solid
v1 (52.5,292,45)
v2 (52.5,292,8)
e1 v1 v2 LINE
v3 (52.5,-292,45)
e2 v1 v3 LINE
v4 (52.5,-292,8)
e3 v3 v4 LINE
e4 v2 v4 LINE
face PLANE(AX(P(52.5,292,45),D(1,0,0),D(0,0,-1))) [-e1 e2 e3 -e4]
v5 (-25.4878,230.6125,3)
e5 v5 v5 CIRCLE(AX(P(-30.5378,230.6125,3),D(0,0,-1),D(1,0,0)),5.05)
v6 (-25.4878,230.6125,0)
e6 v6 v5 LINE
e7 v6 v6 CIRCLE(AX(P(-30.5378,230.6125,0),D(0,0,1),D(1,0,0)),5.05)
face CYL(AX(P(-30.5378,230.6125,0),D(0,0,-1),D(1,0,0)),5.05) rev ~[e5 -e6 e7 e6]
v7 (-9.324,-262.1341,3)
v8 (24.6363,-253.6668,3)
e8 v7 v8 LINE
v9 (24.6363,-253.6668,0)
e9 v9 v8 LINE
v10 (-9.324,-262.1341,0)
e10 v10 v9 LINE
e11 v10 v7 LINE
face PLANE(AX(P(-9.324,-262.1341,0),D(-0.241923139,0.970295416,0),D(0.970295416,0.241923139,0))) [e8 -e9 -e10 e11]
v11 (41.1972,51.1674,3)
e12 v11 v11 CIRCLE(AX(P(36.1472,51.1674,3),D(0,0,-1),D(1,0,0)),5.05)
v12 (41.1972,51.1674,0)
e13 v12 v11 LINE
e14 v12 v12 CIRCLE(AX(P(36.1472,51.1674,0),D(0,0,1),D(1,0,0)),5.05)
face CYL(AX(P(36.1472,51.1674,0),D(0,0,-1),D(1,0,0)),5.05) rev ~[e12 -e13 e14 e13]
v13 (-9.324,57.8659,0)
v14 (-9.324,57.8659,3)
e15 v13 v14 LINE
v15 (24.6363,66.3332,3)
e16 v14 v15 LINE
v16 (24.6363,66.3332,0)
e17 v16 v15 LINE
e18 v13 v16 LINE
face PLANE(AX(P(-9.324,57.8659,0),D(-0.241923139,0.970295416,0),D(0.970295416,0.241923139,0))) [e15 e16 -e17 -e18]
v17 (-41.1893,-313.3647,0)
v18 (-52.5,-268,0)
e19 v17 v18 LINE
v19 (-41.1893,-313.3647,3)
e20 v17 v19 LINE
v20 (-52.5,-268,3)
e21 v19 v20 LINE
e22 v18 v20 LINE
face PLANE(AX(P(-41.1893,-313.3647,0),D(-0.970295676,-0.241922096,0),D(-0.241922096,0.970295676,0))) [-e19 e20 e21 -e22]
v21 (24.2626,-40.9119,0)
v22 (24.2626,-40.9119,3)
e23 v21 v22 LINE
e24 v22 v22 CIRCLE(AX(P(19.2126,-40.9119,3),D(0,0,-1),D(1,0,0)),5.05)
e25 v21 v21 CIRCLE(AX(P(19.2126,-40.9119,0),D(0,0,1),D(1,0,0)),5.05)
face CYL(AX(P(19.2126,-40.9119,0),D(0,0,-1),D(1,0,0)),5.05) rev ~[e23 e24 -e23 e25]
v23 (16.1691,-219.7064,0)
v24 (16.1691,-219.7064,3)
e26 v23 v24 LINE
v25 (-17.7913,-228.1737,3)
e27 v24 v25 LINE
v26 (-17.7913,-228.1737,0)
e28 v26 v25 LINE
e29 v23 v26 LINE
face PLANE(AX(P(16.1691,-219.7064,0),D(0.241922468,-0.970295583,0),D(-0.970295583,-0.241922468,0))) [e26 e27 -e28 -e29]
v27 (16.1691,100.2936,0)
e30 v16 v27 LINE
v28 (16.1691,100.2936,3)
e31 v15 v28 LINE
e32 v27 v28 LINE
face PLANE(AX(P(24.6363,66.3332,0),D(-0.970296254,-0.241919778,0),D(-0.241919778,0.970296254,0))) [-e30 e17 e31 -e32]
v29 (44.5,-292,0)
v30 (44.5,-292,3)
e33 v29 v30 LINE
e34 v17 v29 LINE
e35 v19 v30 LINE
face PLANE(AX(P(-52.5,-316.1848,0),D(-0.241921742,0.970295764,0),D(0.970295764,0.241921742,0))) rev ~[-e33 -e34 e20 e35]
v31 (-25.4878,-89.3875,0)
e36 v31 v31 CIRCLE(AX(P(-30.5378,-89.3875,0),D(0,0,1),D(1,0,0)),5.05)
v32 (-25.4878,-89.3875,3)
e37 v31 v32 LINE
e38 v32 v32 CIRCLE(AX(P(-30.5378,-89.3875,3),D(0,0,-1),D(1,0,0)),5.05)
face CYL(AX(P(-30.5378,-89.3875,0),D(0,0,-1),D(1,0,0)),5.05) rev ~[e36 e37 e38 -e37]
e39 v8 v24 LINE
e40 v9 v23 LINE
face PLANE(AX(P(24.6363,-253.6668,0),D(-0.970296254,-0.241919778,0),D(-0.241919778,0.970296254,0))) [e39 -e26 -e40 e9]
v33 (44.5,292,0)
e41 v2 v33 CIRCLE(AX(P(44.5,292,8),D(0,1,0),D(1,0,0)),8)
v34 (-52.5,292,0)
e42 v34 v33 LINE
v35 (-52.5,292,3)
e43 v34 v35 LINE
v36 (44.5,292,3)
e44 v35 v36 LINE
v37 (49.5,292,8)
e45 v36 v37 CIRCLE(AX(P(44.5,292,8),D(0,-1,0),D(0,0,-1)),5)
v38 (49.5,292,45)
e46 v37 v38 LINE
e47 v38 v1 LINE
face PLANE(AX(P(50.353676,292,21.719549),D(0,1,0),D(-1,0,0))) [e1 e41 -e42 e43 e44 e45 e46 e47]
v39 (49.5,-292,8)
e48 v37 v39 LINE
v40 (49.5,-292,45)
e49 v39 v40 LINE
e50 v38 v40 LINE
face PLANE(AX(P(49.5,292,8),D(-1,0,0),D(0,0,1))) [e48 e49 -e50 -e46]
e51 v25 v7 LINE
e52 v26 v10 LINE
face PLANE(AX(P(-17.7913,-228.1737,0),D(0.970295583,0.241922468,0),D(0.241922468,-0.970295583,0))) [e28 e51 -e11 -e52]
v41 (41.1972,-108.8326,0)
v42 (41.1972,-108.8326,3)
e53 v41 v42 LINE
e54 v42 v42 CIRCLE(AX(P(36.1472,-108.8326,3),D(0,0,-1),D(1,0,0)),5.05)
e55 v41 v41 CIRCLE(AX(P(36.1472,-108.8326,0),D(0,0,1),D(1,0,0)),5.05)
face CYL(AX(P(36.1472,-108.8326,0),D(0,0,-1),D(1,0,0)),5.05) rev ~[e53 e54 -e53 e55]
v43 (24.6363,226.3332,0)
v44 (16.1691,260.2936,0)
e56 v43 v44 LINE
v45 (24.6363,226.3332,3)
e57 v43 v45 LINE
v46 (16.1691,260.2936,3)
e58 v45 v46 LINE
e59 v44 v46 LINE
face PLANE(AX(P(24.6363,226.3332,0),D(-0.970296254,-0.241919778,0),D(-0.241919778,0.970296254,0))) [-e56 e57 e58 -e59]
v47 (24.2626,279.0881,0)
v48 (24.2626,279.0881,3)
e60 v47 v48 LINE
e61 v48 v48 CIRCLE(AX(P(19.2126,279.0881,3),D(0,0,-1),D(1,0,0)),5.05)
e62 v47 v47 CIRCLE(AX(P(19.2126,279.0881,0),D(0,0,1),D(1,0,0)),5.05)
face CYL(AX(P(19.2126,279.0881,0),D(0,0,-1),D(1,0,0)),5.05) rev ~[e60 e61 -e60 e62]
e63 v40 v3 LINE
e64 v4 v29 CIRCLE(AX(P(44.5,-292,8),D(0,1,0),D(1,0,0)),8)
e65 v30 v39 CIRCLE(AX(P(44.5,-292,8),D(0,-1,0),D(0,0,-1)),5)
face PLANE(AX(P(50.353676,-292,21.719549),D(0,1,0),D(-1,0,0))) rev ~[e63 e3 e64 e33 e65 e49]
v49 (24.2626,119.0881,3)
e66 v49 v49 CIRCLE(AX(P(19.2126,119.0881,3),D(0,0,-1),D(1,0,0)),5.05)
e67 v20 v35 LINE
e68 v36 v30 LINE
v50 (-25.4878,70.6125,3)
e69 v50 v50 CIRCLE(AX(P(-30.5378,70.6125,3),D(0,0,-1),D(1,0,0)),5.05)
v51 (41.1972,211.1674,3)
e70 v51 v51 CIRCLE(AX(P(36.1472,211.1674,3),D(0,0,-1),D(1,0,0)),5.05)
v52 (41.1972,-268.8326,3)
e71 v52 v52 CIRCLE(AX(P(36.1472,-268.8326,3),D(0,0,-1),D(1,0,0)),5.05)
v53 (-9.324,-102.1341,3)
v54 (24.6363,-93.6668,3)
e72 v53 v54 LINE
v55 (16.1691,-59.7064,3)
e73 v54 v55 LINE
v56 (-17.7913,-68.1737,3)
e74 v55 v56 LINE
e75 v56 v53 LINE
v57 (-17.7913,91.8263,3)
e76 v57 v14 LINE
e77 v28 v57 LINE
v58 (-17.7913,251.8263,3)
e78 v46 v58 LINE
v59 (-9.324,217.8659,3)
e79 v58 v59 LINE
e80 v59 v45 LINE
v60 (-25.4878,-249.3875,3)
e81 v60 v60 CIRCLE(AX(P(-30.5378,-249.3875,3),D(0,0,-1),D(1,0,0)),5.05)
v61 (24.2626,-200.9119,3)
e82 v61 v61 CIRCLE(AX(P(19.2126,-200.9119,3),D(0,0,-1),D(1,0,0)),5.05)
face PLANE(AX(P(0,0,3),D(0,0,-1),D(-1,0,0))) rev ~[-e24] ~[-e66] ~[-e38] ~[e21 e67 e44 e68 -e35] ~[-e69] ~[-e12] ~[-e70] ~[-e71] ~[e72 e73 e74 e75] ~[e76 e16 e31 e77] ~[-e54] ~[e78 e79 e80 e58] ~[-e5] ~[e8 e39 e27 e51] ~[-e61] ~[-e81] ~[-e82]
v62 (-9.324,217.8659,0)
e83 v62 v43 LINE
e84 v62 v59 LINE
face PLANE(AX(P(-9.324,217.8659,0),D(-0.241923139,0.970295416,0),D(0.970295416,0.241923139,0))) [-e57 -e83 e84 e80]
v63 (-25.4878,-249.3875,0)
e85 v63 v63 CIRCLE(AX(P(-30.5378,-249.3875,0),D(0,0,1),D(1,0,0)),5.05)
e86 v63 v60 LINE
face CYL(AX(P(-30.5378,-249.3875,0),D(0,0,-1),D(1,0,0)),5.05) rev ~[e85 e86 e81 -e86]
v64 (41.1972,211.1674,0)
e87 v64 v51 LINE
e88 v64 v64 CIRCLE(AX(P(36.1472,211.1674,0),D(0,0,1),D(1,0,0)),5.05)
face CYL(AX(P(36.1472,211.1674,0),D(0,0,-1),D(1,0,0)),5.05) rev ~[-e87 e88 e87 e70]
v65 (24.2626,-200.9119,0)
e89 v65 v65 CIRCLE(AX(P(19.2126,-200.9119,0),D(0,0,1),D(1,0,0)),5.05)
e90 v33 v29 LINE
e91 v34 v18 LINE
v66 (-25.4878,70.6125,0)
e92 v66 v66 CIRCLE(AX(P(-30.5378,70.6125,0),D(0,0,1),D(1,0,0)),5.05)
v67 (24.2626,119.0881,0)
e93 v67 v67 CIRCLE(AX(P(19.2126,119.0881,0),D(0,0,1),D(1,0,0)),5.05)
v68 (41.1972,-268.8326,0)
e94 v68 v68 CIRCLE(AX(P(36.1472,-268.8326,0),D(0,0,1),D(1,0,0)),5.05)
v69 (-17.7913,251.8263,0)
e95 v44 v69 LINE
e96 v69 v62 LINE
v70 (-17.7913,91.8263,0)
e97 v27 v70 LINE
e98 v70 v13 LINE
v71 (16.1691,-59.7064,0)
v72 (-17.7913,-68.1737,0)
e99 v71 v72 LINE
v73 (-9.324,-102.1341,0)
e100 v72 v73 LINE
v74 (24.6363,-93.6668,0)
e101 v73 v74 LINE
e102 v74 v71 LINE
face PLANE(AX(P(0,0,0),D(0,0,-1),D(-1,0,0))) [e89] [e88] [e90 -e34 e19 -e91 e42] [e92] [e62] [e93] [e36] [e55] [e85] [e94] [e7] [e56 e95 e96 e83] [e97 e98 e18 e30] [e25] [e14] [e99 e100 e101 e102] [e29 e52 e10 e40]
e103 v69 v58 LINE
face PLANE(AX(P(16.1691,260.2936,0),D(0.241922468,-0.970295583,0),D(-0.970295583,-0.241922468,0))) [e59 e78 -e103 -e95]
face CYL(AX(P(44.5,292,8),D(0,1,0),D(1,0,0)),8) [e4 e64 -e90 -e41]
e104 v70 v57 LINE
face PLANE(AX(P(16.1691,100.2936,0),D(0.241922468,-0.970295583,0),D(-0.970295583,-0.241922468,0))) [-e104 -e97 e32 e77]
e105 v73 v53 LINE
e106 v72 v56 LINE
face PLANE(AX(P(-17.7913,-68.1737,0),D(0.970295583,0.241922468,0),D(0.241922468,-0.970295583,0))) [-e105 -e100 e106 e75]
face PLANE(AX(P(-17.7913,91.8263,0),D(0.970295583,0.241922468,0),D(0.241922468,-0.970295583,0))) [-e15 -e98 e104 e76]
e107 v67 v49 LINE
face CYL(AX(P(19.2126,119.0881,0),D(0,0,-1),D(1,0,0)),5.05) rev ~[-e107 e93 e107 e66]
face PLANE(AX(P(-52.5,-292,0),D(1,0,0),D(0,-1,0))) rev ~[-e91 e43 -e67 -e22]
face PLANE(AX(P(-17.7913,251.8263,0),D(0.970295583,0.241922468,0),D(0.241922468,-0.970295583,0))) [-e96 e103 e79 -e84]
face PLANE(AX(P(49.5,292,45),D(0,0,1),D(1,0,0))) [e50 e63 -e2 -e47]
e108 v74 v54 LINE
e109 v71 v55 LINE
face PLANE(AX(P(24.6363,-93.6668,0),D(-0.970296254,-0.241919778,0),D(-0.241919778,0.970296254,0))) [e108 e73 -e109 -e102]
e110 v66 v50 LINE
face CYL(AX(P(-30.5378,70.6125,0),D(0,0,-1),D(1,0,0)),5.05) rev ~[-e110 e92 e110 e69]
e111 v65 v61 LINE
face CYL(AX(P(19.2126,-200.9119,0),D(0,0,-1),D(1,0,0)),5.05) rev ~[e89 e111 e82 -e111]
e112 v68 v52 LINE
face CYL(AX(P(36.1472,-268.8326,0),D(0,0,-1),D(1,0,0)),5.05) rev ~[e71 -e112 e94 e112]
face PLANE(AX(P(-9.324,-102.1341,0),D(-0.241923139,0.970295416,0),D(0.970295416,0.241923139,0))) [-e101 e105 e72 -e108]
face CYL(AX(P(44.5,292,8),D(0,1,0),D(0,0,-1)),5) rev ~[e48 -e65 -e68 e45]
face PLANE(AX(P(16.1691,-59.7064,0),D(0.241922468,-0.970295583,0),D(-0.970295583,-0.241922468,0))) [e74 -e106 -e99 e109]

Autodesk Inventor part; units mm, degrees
ref_plane "YZ Plane" through (0, 0, 0) normal (1, 0, 0) x (0, 1, 0)
ref_plane "XZ Plane" through (0, 0, 0) normal (0, 1, 0) x (-1, 0, 0)
ref_plane "XY Plane" through (0, 0, 0) normal (0, 0, 1) x (1, 0, 0)
sketch "Sketch1" plane through (0, 0, 0) normal (0, 0, 1) x (1, 0, 0)
  line L0 (-52.5, 292) -> (52.5, 292)
  line L1 (52.5, 292) -> (52.5, -292)
  line L2 (52.5, -292) -> (-52.5, -292)
  line L3 (-52.5, -292) -> (-52.5, 292)
  line L4 (-52.5, 292) -> (52.5, -292) construction
  point P0 (0, 0)
  point P1 (0, 0)
  dimension "d0" = 105
  dimension "d1" = 584
extrude "Plate1" add sketch "Sketch1" along normal blind 3
sketch "Sketch4" plane through (49.5, 292, 0) normal (1, 0, 0) x (0, 1, 0)
  line L0 (-584, 0) -> (0, 0)
  line L1 (0, 0) -> (0, 45)
  line L2 (0, 45) -> (-584, 45)
  line L3 (-584, 45) -> (-584, 0)
edge flange "Flange1" height 45 angle 90 thickness 3 bend radius 5 thickness toward (1, 0, 0) relief round relief width 3 relief depth 1.5 edges at (52.5, 0, 3) wall of the first edge with corners at (49.5, -292, 0) (49.5, 292, 0) (49.5, 292, 45) (49.5, -292, 45)
bend "Bend1"
corner "Corner1"
sketch "Sketch5" plane through (0, 0, 0) normal (0, 0, -1) x (-1, 0, 0)
  line L0 (-44.5, 292) -> (-44.5, -292) projected
  line L1 (52.5, -292) -> (-44.5, -292) projected
  line L2 (52.5, 292) -> (52.5, -292) projected
  line L3 (-44.5, 292) -> (52.5, 292) projected
  line L4 (52.5, -292) -> (52.5, -316.1848)
  line L5 (-44.5, -292) -> (52.5, -292) projected
  line L6 (52.5, -316.1848) -> (-44.5, -292)
  point P0 (0, 0)
  dimension "d25" = 14
extrude "Extrusion2" add sketch "Sketch5" against normal up to surface (3 mm away) contours L1 L4 L6
sketch "Sketch6" plane through (0, 0, 0) normal (0, 0, -1) x (-1, 0, 0)
  line L0 (-44.5, 292) -> (-44.5, -292) construction
  line L1 (-44.5, -292) -> (52.5, -316.1848) projected
  line L2 (52.5, 292) -> (52.5, -316.1848) projected
  line L3 (-44.5, 292) -> (52.5, 292) construction
  line L4 (41.1893, -313.3647) -> (52.5, -268)
  line L5 (-44.5, -292) -> (52.5, -316.1848) projected
  point P0 (0, 0)
  dimension "d45" = 560
extrude "Cut1" cut sketch "Sketch6" against normal blind 3
sketch "Sketch7" plane through (0, 0, 0) normal (0, 0, 1) x (1, 0, 0)
  line L0 (44.5, -292) -> (-41.1893, -313.3647) projected
  circle A0 centre (36.1472, -268.8326) radius 5.05
  line L1 (36.1472, -268.8326) -> (19.2126, -200.9119) construction
  line L2 (24.6363, -253.6668) -> (16.1691, -219.7064)
  circle A1 centre (19.2126, -200.9119) radius 5.05
  line L3 (-30.5378, -249.3875) -> (36.1472, -268.8326) construction
  line L4 (24.6363, -253.6668) -> (-17.7913, -228.1737) construction
  line L5 (16.1691, -219.7064) -> (-17.7913, -228.1737)
  line L6 (-9.324, -262.1341) -> (24.6363, -253.6668)
  line L7 (16.1691, -219.7064) -> (-9.324, -262.1341) construction
  line L8 (-17.7913, -228.1737) -> (-9.324, -262.1341)
  line L9 (20.4027, -236.6866) -> (-30.5378, -249.3875) construction
  line L10 (19.2126, -200.9119) -> (-30.5378, -249.3875) construction
  circle A2 centre (-30.5378, -249.3875) radius 5.05
  point P0 (0, 0)
  point P1 (3.4225, -240.9203)
  dimension "d32" = 35
  dimension "d33" = 35
  dimension "d34" = 10.1
  dimension "d35" = 70
  dimension "d36" = 60
  dimension "d37" = 25
  dimension "d38" = 10
  dimension "d39" = 42
extrude "Extrusion3" cut sketch "Sketch7" along normal through all
pattern_linear "Rectangular Pattern1" count 4 spacing 160 along (0, 1, 0) of "Extrusion3"
equation "\"d0\" = RIDGE_1_hight"
equation "\"d25\" = RIDGE_1_angle"
equation "\"d45\" = RIDGE_1_lenth"
equation "\"d30\" = Thickness"
equation "\"d33\" = d32"
equation "\"d2\" = Thickness"
equation "\"d15\" = BendReliefWidth"
equation "\"d16\" = BendReliefDepth"
equation "\"d17\" = MinimumRemnant"
equation "\"d18\" = TransitionRadius"
equation "\"d21\" = BendRadius"
equation "\"d22\" = CornerReliefSize"
equation "\"d23\" = GapSize"
equation "\"d24\" = JacobiRadiusSize"
equation "\"BendReliefWidth\" = Thickness"
equation "\"BendReliefDepth\" = 0.5 * Thickness"
equation "\"CornerReliefSize\" = 4 * Thickness"
equation "\"MinimumRemnant\" = 2 * Thickness"
equation "\"TransitionRadius\" = BendRadius"
equation "\"JacobiRadiusSize\" = BendRadius"
equation "\"GapSize\" = Thickness"
equation "\"RIDGE_1_hight\" = 105"
equation "\"RIDGE_1_angle\" = 14deg"
equation "\"RIDGE_1_lenth\" = 560"
equation "\"Thickness\" = 3"
equation "\"BendRadius\" = 5"
properties part number "DS-B-103 Ridge top" material "Stainless Steel"
